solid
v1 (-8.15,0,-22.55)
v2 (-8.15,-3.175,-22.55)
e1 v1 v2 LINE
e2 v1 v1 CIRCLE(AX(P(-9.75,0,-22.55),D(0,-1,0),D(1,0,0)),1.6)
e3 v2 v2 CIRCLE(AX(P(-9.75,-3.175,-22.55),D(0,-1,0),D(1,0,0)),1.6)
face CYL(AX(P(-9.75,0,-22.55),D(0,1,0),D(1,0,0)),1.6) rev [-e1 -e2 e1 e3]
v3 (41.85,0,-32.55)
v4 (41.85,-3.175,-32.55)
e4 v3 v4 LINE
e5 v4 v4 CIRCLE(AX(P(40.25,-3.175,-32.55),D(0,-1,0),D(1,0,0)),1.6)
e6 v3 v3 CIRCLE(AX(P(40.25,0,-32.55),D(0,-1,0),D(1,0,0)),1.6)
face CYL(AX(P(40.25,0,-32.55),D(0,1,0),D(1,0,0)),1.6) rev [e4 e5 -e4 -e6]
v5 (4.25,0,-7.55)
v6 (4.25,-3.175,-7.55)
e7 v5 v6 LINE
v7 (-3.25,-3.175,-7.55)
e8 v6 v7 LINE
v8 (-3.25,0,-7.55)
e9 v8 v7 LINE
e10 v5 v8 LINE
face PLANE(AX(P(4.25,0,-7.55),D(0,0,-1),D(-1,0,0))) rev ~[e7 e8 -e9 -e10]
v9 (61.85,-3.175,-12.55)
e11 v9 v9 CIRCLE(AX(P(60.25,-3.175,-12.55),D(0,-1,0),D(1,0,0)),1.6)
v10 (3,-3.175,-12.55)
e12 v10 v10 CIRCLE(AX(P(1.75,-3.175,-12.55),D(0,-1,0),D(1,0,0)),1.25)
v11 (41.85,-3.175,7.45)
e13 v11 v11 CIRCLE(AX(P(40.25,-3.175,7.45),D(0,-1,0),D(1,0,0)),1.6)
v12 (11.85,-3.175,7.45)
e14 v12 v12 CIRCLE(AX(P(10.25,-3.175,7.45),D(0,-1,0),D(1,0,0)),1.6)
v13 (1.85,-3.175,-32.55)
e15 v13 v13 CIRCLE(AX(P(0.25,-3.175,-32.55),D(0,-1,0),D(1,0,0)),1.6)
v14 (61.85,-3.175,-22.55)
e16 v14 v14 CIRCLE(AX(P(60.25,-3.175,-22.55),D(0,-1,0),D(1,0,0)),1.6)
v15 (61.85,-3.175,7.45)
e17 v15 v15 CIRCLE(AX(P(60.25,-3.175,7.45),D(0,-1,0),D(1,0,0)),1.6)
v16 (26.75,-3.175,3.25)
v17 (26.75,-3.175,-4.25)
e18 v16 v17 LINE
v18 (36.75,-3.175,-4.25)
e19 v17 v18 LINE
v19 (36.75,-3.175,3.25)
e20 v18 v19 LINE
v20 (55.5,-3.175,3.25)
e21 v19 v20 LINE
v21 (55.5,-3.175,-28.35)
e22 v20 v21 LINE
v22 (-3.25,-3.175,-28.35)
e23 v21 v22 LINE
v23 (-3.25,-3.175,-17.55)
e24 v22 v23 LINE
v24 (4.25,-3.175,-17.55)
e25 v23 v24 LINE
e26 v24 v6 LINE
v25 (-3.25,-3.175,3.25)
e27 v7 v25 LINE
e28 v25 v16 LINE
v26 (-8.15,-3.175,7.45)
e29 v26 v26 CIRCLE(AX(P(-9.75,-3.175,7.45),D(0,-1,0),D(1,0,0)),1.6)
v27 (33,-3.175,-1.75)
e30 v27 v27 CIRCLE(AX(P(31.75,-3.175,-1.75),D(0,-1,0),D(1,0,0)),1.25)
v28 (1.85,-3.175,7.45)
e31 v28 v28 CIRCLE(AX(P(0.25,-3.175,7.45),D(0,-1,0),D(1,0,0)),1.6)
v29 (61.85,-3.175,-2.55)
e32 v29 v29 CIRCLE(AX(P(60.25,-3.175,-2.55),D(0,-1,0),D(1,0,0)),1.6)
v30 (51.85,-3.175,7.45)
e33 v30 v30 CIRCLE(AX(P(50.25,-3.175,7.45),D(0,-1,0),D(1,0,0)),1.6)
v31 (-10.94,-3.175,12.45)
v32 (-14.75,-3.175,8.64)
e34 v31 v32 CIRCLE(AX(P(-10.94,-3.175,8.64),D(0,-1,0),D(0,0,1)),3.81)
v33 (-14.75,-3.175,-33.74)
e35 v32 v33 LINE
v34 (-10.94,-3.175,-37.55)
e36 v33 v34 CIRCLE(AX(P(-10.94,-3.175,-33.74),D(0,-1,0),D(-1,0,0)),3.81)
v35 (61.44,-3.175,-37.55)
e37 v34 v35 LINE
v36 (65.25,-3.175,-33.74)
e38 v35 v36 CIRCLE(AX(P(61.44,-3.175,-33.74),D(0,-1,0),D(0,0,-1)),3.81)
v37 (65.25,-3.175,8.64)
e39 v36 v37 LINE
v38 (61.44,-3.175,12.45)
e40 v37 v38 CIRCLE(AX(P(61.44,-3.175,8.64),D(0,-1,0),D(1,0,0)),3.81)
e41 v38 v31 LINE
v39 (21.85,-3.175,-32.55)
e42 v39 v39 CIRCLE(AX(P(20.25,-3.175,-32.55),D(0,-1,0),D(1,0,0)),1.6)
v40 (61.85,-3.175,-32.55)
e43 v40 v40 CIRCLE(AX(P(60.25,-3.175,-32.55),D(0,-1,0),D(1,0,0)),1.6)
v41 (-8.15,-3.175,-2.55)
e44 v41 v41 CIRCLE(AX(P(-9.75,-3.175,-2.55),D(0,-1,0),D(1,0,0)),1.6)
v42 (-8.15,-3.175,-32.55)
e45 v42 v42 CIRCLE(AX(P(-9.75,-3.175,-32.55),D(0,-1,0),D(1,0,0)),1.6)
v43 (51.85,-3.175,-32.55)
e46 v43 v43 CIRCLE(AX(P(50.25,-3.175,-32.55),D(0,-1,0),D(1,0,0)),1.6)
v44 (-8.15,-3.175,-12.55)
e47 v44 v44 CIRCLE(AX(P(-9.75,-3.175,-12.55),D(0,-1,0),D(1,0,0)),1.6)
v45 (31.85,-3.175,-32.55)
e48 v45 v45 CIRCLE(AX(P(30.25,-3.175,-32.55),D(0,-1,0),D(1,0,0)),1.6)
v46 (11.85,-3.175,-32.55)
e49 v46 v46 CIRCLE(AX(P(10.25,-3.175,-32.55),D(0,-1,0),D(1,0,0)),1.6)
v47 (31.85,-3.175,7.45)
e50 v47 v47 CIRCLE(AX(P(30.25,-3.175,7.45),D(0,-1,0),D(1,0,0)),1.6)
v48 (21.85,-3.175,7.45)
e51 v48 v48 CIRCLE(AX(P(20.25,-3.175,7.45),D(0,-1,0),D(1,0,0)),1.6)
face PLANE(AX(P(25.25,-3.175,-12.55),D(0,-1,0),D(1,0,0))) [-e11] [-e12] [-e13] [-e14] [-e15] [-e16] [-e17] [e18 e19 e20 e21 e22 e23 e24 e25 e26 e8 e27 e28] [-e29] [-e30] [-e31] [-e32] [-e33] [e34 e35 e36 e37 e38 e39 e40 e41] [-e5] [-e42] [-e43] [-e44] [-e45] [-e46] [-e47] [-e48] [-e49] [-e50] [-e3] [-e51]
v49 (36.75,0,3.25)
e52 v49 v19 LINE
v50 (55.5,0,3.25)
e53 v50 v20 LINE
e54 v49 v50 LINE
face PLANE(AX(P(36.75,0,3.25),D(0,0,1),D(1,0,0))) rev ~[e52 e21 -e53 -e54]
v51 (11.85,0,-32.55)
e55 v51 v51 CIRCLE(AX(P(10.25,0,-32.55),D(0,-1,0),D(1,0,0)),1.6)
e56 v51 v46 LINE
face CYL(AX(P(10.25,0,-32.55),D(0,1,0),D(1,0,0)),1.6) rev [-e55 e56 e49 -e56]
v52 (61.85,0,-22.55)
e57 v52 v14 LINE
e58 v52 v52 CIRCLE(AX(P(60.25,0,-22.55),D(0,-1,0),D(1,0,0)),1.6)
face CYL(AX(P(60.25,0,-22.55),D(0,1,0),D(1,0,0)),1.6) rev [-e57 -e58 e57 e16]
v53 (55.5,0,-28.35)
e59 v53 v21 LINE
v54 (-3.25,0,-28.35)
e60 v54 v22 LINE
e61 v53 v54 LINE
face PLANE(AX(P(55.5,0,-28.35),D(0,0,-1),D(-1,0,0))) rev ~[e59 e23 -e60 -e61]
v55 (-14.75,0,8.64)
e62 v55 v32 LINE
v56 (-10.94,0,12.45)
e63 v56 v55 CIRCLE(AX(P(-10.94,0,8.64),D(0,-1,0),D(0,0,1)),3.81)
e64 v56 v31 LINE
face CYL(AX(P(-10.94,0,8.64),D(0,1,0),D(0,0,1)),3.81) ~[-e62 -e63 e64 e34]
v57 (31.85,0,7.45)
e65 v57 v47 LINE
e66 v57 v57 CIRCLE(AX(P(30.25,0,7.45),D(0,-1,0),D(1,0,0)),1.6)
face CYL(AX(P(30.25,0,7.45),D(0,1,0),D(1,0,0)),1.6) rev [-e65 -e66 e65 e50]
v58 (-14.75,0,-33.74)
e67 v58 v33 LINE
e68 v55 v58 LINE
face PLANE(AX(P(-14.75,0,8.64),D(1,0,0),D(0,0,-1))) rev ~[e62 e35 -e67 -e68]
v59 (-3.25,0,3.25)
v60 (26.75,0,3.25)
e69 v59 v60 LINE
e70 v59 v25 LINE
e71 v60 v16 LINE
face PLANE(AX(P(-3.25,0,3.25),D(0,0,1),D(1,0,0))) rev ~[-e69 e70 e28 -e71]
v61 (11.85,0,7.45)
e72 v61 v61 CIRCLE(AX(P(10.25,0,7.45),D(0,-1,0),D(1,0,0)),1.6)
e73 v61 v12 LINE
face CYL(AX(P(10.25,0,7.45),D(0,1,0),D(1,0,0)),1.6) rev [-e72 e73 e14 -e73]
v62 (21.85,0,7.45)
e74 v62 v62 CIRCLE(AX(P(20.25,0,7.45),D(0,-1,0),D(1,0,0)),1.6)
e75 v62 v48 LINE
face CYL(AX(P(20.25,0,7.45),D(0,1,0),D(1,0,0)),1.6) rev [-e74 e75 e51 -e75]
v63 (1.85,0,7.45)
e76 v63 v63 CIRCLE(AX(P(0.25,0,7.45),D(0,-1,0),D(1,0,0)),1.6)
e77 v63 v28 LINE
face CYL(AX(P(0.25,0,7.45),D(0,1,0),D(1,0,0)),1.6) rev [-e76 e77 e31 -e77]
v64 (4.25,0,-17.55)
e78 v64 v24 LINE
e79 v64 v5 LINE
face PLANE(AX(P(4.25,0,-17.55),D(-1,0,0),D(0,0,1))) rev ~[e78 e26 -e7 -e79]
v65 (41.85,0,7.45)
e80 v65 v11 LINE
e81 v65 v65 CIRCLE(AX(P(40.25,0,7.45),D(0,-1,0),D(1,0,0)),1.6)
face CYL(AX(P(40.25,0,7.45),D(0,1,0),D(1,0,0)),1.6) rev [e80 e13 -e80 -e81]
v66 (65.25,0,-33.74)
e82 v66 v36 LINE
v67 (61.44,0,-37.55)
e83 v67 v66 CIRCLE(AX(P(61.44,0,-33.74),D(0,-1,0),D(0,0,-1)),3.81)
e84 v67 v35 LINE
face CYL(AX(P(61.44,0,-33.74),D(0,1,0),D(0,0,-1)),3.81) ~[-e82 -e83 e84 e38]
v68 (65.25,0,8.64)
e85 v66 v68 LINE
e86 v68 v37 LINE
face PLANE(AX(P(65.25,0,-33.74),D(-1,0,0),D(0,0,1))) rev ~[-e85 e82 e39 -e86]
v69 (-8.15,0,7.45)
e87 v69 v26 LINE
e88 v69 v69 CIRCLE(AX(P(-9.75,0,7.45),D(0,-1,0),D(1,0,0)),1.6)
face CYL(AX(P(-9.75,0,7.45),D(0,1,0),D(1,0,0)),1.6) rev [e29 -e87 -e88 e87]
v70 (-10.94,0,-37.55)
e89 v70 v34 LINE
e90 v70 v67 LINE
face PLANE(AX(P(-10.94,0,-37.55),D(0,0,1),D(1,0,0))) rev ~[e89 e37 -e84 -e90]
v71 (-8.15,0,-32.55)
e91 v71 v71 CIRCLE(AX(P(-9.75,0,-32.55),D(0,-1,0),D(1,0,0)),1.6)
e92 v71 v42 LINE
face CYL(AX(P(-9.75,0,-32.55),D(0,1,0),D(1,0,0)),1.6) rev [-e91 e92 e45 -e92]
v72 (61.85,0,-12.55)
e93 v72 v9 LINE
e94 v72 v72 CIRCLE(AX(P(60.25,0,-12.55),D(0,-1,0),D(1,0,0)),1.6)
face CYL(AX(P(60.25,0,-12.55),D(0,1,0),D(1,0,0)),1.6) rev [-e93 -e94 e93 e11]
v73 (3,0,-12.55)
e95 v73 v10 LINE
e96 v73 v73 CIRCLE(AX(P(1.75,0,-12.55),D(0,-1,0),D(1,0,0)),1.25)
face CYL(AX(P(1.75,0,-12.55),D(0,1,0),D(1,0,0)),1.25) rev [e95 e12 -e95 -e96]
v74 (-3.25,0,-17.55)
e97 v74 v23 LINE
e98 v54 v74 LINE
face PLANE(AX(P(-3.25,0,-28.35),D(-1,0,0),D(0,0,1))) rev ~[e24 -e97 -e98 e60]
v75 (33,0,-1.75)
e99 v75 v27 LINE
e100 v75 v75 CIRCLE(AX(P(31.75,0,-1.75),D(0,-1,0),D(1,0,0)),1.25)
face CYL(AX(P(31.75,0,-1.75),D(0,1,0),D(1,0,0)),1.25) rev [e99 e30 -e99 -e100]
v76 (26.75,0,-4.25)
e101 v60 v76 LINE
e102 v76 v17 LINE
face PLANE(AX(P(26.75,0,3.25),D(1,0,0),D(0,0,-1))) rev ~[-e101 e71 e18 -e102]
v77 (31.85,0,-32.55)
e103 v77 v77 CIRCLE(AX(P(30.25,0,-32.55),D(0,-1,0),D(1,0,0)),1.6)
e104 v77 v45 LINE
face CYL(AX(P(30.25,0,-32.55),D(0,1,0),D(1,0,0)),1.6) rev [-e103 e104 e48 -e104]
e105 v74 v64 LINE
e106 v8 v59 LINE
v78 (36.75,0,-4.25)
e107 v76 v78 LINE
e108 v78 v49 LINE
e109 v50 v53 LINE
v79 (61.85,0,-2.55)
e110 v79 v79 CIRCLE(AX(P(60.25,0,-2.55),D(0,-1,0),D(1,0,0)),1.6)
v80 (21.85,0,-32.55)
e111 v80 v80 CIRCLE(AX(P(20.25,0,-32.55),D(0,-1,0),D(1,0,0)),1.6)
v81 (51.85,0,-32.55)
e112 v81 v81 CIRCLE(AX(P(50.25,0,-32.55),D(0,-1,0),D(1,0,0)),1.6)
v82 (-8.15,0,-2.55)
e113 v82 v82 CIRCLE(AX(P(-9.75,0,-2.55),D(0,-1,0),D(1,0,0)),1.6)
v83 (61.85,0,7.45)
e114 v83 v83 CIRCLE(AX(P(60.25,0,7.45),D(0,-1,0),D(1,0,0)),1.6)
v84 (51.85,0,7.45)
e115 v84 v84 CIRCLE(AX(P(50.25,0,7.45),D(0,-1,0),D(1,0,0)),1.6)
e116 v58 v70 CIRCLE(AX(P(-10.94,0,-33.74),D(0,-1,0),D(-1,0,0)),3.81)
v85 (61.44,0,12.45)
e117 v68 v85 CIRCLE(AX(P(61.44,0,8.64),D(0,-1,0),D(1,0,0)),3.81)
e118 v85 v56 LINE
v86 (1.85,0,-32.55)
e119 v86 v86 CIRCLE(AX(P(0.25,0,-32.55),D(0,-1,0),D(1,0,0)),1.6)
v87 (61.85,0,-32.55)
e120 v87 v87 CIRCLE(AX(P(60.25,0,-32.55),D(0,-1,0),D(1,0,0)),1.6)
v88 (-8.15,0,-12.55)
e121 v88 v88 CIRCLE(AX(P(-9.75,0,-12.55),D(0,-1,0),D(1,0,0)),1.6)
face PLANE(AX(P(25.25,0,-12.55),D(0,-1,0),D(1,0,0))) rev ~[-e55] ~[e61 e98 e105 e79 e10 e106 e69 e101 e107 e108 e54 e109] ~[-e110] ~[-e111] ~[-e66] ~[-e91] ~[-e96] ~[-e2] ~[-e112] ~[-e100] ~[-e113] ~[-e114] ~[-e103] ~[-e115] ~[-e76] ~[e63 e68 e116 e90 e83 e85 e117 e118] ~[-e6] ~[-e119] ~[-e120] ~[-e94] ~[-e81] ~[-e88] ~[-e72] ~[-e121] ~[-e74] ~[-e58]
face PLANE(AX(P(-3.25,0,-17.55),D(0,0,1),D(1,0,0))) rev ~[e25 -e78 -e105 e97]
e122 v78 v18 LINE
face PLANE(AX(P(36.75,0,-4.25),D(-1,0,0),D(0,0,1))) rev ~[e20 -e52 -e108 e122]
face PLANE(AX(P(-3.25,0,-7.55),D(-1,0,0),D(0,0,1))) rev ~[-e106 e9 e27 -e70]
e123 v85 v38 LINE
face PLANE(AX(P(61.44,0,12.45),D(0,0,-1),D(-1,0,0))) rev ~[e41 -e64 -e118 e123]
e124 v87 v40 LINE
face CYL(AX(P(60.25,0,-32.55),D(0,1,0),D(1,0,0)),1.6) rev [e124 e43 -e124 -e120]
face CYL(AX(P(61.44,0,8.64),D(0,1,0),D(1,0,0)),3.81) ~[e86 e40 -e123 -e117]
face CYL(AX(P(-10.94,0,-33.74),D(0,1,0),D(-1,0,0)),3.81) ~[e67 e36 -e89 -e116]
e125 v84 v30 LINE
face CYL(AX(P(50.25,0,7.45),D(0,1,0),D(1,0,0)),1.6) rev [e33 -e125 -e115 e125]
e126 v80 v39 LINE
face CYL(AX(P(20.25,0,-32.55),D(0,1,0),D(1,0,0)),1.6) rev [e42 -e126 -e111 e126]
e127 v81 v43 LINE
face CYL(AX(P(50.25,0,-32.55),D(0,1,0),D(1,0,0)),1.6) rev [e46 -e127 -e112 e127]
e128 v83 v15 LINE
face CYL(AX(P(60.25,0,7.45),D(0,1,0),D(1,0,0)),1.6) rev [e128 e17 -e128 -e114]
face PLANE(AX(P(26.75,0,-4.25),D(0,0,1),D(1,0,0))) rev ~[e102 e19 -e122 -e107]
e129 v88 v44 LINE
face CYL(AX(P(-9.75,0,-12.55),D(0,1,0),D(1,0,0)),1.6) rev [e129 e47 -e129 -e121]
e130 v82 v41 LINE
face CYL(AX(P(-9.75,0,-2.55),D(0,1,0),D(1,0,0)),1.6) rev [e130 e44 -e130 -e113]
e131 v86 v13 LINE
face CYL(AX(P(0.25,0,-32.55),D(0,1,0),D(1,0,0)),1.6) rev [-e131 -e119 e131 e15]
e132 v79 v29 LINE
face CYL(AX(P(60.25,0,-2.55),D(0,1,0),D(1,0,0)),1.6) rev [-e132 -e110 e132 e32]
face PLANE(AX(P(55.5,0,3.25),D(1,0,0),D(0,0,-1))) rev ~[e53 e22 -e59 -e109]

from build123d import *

# Parameters (mm, degrees)
F0_R     = 1.6
F0_R_2   = 1.25
F1_DEPTH = 3.175


# Not quite as in the source:
# - a length typed as a fraction of an inch, garbled in the dataset ("3 / 203.2 mm" for 3/8 in), is restored


with BuildPart() as f1:
    # F0 (on Front) → F1 (new body)
    with BuildSketch(Plane.XZ):
        with BuildLine():
            Line((61.44, 12.45), (-10.94, 12.45))
            ThreePointArc((-10.94, 12.45), (-13.6340768363, 11.3340768363), (-14.75, 8.64))
            Line((-14.75, 8.64), (-14.75, -33.74))
            ThreePointArc((-14.75, -33.74), (-13.6340768363, -36.4340768363), (-10.94, -37.55))
            Line((-10.94, -37.55), (61.44, -37.55))
            ThreePointArc((61.44, -37.55), (64.1340768363, -36.4340768363), (65.25, -33.74))
            Line((65.25, -33.74), (65.25, 8.64))
            ThreePointArc((65.25, 8.64), (64.1340768363, 11.3340768363), (61.44, 12.45))
        make_face()
        with Locations((-9.75, -32.55)):
            Circle(F0_R, mode=Mode.SUBTRACT)
        with Locations((0.25, -32.55)):
            Circle(F0_R, mode=Mode.SUBTRACT)
        with Locations((10.25, -32.55)):
            Circle(F0_R, mode=Mode.SUBTRACT)
        with Locations((20.25, -32.55)):
            Circle(F0_R, mode=Mode.SUBTRACT)
        with Locations((-9.75, -22.55)):
            Circle(F0_R, mode=Mode.SUBTRACT)
        with Locations((30.25, -32.55)):
            Circle(F0_R, mode=Mode.SUBTRACT)
        with Locations((40.25, -32.55)):
            Circle(F0_R, mode=Mode.SUBTRACT)
        with Locations((50.25, -32.55)):
            Circle(F0_R, mode=Mode.SUBTRACT)
        with Locations((60.25, -32.55)):
            Circle(F0_R, mode=Mode.SUBTRACT)
        with Locations((60.25, -22.55)):
            Circle(F0_R, mode=Mode.SUBTRACT)
        with Locations((-9.75, -12.55)):
            Circle(F0_R, mode=Mode.SUBTRACT)
        with Locations((1.75, -12.55)):
            Circle(F0_R_2, mode=Mode.SUBTRACT)
        with Locations((-9.75, -2.55)):
            Circle(F0_R, mode=Mode.SUBTRACT)
        with Locations((-9.75, 7.45)):
            Circle(F0_R, mode=Mode.SUBTRACT)
        with Locations((0.25, 7.45)):
            Circle(F0_R, mode=Mode.SUBTRACT)
        with Locations((10.25, 7.45)):
            Circle(F0_R, mode=Mode.SUBTRACT)
        with Locations((20.25, 7.45)):
            Circle(F0_R, mode=Mode.SUBTRACT)
        Polygon((26.75, -4.25), (36.75, -4.25), (36.75, 3.25), (55.5, 3.25), (55.5, -28.35), (-3.25, -28.35), (-3.25, -17.55), (4.25, -17.55), (4.25, -7.55), (-3.25, -7.55), (-3.25, 3.25), (26.75, 3.25), align=None, mode=Mode.SUBTRACT)
        with Locations((31.75, -1.75)):
            Circle(F0_R_2, mode=Mode.SUBTRACT)
        with Locations((60.25, -12.55)):
            Circle(F0_R, mode=Mode.SUBTRACT)
        with Locations((60.25, -2.55)):
            Circle(F0_R, mode=Mode.SUBTRACT)
        with Locations((30.25, 7.45)):
            Circle(F0_R, mode=Mode.SUBTRACT)
        with Locations((40.25, 7.45)):
            Circle(F0_R, mode=Mode.SUBTRACT)
        with Locations((50.25, 7.45)):
            Circle(F0_R, mode=Mode.SUBTRACT)
        with Locations((60.25, 7.45)):
            Circle(F0_R, mode=Mode.SUBTRACT)
    extrude(amount=F1_DEPTH)


solid = f1.part
